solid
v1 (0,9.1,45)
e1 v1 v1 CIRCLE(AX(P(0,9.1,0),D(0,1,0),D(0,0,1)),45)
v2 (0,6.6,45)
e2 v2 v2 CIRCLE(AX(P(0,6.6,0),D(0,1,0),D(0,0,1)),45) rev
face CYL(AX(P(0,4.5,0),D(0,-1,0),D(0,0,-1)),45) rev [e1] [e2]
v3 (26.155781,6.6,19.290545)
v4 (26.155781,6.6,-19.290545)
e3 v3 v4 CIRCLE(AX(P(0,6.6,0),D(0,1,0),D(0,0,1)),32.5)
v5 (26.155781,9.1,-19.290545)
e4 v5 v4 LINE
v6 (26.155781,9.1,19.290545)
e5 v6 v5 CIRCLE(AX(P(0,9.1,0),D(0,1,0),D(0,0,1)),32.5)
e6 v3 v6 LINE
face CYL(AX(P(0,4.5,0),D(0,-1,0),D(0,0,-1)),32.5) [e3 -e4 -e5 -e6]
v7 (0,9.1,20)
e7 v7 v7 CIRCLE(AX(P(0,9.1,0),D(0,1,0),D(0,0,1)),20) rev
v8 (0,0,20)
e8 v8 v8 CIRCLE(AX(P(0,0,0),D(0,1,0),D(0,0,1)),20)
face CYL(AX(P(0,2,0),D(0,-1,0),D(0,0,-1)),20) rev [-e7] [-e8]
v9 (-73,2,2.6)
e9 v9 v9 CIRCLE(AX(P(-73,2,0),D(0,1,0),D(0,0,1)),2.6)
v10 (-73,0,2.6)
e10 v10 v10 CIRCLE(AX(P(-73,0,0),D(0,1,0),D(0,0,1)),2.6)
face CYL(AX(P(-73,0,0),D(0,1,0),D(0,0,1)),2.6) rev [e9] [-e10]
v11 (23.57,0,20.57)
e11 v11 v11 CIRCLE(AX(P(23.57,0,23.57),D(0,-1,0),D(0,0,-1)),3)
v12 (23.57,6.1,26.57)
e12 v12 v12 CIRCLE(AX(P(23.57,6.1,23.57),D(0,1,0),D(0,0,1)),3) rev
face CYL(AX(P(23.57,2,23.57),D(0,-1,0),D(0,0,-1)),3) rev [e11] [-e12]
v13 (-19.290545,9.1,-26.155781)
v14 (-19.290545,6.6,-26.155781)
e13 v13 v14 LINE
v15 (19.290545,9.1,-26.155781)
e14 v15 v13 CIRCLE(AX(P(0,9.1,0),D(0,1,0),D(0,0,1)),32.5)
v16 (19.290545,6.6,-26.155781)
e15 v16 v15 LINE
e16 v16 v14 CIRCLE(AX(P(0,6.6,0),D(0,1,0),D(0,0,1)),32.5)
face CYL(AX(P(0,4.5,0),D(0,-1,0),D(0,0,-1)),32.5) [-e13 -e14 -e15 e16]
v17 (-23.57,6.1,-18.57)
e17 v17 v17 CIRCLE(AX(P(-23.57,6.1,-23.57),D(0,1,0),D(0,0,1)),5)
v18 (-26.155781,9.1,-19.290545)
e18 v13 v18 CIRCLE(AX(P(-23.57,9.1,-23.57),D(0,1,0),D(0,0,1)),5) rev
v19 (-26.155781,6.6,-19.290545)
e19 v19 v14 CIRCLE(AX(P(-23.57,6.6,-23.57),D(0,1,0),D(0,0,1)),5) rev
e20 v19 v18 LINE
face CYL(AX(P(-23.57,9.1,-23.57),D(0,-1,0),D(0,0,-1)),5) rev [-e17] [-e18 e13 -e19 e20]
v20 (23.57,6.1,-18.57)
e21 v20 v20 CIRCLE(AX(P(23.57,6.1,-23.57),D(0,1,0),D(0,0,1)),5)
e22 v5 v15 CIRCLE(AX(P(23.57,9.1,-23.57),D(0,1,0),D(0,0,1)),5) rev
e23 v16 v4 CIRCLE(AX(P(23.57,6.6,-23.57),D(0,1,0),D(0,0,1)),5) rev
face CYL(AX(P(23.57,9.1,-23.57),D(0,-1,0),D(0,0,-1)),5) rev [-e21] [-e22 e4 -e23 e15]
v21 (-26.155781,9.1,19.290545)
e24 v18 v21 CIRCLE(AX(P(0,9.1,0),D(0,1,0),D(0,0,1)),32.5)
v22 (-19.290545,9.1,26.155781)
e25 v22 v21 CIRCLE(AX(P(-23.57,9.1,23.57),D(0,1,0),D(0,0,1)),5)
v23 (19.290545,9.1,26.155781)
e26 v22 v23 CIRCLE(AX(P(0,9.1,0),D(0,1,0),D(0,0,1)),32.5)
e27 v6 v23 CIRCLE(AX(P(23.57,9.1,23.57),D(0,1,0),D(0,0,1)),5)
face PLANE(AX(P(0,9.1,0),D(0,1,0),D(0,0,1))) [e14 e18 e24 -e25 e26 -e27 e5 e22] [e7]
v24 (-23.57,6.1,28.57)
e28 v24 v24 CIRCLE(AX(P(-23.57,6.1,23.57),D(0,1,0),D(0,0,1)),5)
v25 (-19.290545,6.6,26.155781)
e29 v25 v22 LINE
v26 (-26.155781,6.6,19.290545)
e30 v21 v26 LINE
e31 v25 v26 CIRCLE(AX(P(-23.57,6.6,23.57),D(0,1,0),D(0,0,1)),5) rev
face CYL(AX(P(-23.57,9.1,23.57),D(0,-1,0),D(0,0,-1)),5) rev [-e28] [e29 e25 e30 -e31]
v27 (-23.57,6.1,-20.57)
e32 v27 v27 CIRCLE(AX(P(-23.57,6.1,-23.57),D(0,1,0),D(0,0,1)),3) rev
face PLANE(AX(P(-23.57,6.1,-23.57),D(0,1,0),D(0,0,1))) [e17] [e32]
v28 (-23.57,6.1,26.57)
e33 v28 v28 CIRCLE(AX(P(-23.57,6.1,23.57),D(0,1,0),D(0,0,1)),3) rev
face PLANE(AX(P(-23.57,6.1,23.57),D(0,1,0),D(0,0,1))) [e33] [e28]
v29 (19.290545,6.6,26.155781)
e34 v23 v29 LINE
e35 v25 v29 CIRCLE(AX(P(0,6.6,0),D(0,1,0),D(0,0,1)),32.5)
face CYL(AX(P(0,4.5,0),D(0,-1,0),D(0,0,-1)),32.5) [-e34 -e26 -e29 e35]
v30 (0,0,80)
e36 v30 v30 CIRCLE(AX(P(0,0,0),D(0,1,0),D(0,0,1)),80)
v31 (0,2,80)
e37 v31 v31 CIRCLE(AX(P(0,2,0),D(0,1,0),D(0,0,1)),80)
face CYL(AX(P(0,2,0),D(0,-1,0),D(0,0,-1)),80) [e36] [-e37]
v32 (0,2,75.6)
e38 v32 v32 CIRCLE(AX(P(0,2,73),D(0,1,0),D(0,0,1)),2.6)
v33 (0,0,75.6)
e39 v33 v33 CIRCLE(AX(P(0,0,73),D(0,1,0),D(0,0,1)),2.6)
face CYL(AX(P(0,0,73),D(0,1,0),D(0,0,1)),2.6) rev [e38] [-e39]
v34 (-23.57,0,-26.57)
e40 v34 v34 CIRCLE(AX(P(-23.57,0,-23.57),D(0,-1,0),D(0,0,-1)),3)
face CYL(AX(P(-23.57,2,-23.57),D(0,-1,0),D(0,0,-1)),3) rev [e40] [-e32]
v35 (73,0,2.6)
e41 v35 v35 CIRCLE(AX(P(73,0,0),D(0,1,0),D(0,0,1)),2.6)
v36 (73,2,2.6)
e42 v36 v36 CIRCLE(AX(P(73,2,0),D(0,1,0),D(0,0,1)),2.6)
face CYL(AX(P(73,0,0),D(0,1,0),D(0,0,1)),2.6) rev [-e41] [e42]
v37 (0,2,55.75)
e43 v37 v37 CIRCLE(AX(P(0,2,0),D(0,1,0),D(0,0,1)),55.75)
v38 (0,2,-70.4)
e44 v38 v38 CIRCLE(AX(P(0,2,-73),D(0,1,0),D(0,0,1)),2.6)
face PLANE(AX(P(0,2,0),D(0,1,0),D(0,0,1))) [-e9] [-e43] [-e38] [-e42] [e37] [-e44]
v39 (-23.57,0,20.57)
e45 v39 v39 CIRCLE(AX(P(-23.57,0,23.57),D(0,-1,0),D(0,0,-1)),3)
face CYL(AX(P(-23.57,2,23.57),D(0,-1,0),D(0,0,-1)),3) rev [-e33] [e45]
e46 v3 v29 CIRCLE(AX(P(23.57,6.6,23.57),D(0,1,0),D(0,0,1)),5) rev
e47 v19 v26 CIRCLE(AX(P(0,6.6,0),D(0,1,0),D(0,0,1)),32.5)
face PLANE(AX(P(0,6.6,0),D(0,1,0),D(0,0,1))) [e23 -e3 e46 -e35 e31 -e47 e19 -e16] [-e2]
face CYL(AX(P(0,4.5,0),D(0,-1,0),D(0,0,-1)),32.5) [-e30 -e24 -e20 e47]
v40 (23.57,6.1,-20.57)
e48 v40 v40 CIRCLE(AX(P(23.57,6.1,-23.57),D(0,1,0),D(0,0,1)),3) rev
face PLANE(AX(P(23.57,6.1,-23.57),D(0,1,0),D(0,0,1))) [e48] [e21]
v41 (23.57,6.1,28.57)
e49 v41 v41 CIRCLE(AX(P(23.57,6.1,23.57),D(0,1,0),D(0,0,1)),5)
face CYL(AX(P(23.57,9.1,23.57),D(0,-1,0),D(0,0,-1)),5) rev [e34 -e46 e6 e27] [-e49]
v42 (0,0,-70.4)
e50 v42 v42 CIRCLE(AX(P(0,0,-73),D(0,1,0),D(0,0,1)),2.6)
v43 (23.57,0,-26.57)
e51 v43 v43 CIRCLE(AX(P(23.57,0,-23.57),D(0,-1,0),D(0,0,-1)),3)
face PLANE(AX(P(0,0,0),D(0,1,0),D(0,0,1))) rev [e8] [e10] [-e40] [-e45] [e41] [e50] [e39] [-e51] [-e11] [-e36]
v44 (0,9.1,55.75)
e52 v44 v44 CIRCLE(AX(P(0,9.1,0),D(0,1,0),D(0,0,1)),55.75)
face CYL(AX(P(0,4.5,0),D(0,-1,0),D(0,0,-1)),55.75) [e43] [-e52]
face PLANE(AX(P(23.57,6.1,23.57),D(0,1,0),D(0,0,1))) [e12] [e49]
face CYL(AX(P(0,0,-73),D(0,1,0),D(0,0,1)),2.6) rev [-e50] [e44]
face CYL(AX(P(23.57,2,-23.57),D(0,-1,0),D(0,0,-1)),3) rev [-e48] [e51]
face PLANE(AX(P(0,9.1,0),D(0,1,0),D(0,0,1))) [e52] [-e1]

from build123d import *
from build123d.topology import SkipClean

# Parameters (mm, degrees)
SKETCH1_R                 = 80
SKETCH1_R_2               = 20
BOSS_EXTRUDE1_DEPTH       = 2
SKETCH2_R                 = 2.6
CUT_EXTRUDE1_DEPTH        = 114.154761279
SKETCH4_R                 = 3
CUT_EXTRUDE2_DEPTH        = 114.154761279
BOSS_EXTRUDE2_OUTLINE_R   = 55.75
BOSS_EXTRUDE2_OUTLINE_R_2 = 45
BOSS_EXTRUDE2_OUTLINE_R_3 = 20
BOSS_EXTRUDE2_DEPTH       = 2.5
MOVE_START                = 2
MOVE_FACE1_OUTLINE_R      = 55.75
MOVE_FACE1_OUTLINE_R_2    = 3
MOVE_FACE1_OUTLINE_R_3    = 20
MOVE_FACE1_DEPTH          = 4.6
MOVE_START_2              = 6.6
MOVE_FACE1_2_OUTLINE_R    = 55.75
MOVE_FACE1_2_OUTLINE_R_2  = 45
MOVE_FACE1_2_OUTLINE_R_3  = 20
MOVE_FACE1_2_DEPTH        = 2.5
CUT_EXTRUDE3_DEPTH        = 114.329431305
CUT_EXTRUDE3_DEPTH_BACK   = 0.5
SKETCH6_R                 = 5


# Read off the part's stored shape, not the designer's step: Boss-Extrude2, Move Face1
with BuildPart() as part:
    # Sketch1 → Boss-Extrude1 (new body)
    with BuildSketch(Plane(origin=(0, 0, 0), x_dir=(1, 0, 0), z_dir=(0, 1, 0))):
        with Locations(Location((0, 0, 0), (0, 0, 270))):
            Circle(SKETCH1_R)
        with Locations(Location((0, 0, 0), (0, 0, 270))):
            Circle(SKETCH1_R_2, mode=Mode.SUBTRACT)
    extrude(amount=BOSS_EXTRUDE1_DEPTH)

    # Sketch2 → Cut-Extrude1 (cut, through all)
    with BuildSketch(Plane(origin=(0, 2, 0), x_dir=(1, 0, 0), z_dir=(0, 1, 0))):
        with Locations(Location((0, 73, 0), (0, 0, 270))):
            Circle(SKETCH2_R)
        with Locations(Location((73, 0, 0), (0, 0, 270))):
            Circle(SKETCH2_R)
        with Locations(Location((0, -73, 0), (0, 0, 270))):
            Circle(SKETCH2_R)
        with Locations(Location((-73, 0, 0), (0, 0, 270))):
            Circle(SKETCH2_R)
    extrude(amount=-CUT_EXTRUDE1_DEPTH, mode=Mode.SUBTRACT)

    # Sketch4 → Cut-Extrude2 (cut, through all)
    with BuildSketch(Plane.XZ):
        with Locations(Location((-23.57, 23.57, 0), (0, 0, 270))):
            Circle(SKETCH4_R)
        with Locations(Location((23.57, 23.57, 0), (0, 0, 270))):
            Circle(SKETCH4_R)
        with Locations(Location((23.57, -23.57, 0), (0, 0, 270))):
            Circle(SKETCH4_R)
        with Locations(Location((-23.57, -23.57, 0), (0, 0, 270))):
            Circle(SKETCH4_R)
    extrude(amount=-CUT_EXTRUDE2_DEPTH, mode=Mode.SUBTRACT)

    # Boss-Extrude2 outline → Boss-Extrude2 (add)
    # profile 1 of 2: a face of its own
    with BuildSketch(Plane(origin=(0, 2, 0), x_dir=(1, 0, 0), z_dir=(0, 1, 0))):
        Circle(BOSS_EXTRUDE2_OUTLINE_R)
        Circle(BOSS_EXTRUDE2_OUTLINE_R_2, mode=Mode.SUBTRACT)
    # profile 2 of 2: a face of its own
    with BuildSketch(Plane(origin=(0, 2, 0), x_dir=(1, 0, 0), z_dir=(0, 1, 0))):
        with BuildLine():
            ThreePointArc((-24.903217208, -20.88252314), (-21.448679656, -21.448679656), (-20.88252314, -24.903217208))
            ThreePointArc((-20.88252314, -24.903217208), (0, -32.5), (20.88252314, -24.903217208))
            ThreePointArc((20.88252314, -24.903217208), (21.448679656, -21.448679656), (24.903217208, -20.88252314))
            ThreePointArc((24.903217208, -20.88252314), (32.5, 0), (24.903217208, 20.88252314))
            ThreePointArc((24.903217208, 20.88252314), (21.448679656, 21.448679656), (20.88252314, 24.903217208))
            ThreePointArc((20.88252314, 24.903217208), (0, 32.5), (-20.88252314, 24.903217208))
            ThreePointArc((-20.88252314, 24.903217208), (-21.448679656, 21.448679656), (-24.903217208, 20.88252314))
            ThreePointArc((-24.903217208, 20.88252314), (-32.5, 0), (-24.903217208, -20.88252314))
        make_face()
        Circle(BOSS_EXTRUDE2_OUTLINE_R_3, mode=Mode.SUBTRACT)
    extrude(amount=BOSS_EXTRUDE2_DEPTH)

    # Move Face1 outline → Move Face1 (add)
    with SkipClean():  # the faces are left unmerged after this step: merging them gives an invalid solid
        with BuildSketch(Plane(origin=(0, 0, 0), x_dir=(1, 0, 0), z_dir=(0, 1, 0)).offset(MOVE_START)):
            Circle(MOVE_FACE1_OUTLINE_R)
            with Locations((-23.57, -23.57)):
                Circle(MOVE_FACE1_OUTLINE_R_2, mode=Mode.SUBTRACT)
            with Locations((-23.57, 23.57)):
                Circle(MOVE_FACE1_OUTLINE_R_2, mode=Mode.SUBTRACT)
            with Locations((23.57, 23.57)):
                Circle(MOVE_FACE1_OUTLINE_R_2, mode=Mode.SUBTRACT)
            with Locations((23.57, -23.57)):
                Circle(MOVE_FACE1_OUTLINE_R_2, mode=Mode.SUBTRACT)
            Circle(MOVE_FACE1_OUTLINE_R_3, mode=Mode.SUBTRACT)
        extrude(amount=MOVE_FACE1_DEPTH)

    # Move Face1 2 outline → Move Face1 2 (add)
    # profile 1 of 2: a face of its own
    with SkipClean():  # the faces are left unmerged after this step: merging them gives an invalid solid
        with BuildSketch(Plane(origin=(0, 0, 0), x_dir=(1, 0, 0), z_dir=(0, 1, 0)).offset(MOVE_START_2)):
            Circle(MOVE_FACE1_2_OUTLINE_R)
            Circle(MOVE_FACE1_2_OUTLINE_R_2, mode=Mode.SUBTRACT)
        # profile 2 of 2: a face of its own
        with BuildSketch(Plane(origin=(0, 0, 0), x_dir=(1, 0, 0), z_dir=(0, 1, 0)).offset(MOVE_START_2)):
            with BuildLine():
                ThreePointArc((-24.903217208, -20.88252314), (-21.448679656, -21.448679656), (-20.88252314, -24.903217208))
                ThreePointArc((-20.88252314, -24.903217208), (0, -32.5), (20.88252314, -24.903217208))
                ThreePointArc((20.88252314, -24.903217208), (21.448679656, -21.448679656), (24.903217208, -20.88252314))
                ThreePointArc((24.903217208, -20.88252314), (32.5, 0), (24.903217208, 20.88252314))
                ThreePointArc((24.903217208, 20.88252314), (21.448679656, 21.448679656), (20.88252314, 24.903217208))
                ThreePointArc((20.88252314, 24.903217208), (0, 32.5), (-20.88252314, 24.903217208))
                ThreePointArc((-20.88252314, 24.903217208), (-21.448679656, 21.448679656), (-24.903217208, 20.88252314))
                ThreePointArc((-24.903217208, 20.88252314), (-32.5, 0), (-24.903217208, -20.88252314))
            make_face()
            Circle(MOVE_FACE1_2_OUTLINE_R_3, mode=Mode.SUBTRACT)
        extrude(amount=MOVE_FACE1_2_DEPTH)

    # Sketch6 → Cut-Extrude3 (cut, two sides: drawn at the far end of the back side and taken through both)
    with SkipClean():  # the faces are left unmerged after this step: merging them gives an invalid solid
        with BuildSketch(Plane(origin=(0, 6.6, 0), x_dir=(1, 0, 0), z_dir=(0, 1, 0)).offset(-CUT_EXTRUDE3_DEPTH_BACK)):
            with Locations(Location((23.57, 23.57, 0), (0, 0, 148.858312263))):
                Circle(SKETCH6_R)
            with Locations(Location((-23.57, 23.57, 0), (0, 0, 31.141687737))):
                Circle(SKETCH6_R)
            with Locations(Location((23.57, -23.57, 0), (0, 0, 58.858312263))):
                Circle(SKETCH6_R)
            with Locations(Location((-23.57, -23.57, 0), (0, 0, 121.141687737))):
                Circle(SKETCH6_R)
        extrude(amount=CUT_EXTRUDE3_DEPTH + CUT_EXTRUDE3_DEPTH_BACK, mode=Mode.SUBTRACT)


solid = part.part
